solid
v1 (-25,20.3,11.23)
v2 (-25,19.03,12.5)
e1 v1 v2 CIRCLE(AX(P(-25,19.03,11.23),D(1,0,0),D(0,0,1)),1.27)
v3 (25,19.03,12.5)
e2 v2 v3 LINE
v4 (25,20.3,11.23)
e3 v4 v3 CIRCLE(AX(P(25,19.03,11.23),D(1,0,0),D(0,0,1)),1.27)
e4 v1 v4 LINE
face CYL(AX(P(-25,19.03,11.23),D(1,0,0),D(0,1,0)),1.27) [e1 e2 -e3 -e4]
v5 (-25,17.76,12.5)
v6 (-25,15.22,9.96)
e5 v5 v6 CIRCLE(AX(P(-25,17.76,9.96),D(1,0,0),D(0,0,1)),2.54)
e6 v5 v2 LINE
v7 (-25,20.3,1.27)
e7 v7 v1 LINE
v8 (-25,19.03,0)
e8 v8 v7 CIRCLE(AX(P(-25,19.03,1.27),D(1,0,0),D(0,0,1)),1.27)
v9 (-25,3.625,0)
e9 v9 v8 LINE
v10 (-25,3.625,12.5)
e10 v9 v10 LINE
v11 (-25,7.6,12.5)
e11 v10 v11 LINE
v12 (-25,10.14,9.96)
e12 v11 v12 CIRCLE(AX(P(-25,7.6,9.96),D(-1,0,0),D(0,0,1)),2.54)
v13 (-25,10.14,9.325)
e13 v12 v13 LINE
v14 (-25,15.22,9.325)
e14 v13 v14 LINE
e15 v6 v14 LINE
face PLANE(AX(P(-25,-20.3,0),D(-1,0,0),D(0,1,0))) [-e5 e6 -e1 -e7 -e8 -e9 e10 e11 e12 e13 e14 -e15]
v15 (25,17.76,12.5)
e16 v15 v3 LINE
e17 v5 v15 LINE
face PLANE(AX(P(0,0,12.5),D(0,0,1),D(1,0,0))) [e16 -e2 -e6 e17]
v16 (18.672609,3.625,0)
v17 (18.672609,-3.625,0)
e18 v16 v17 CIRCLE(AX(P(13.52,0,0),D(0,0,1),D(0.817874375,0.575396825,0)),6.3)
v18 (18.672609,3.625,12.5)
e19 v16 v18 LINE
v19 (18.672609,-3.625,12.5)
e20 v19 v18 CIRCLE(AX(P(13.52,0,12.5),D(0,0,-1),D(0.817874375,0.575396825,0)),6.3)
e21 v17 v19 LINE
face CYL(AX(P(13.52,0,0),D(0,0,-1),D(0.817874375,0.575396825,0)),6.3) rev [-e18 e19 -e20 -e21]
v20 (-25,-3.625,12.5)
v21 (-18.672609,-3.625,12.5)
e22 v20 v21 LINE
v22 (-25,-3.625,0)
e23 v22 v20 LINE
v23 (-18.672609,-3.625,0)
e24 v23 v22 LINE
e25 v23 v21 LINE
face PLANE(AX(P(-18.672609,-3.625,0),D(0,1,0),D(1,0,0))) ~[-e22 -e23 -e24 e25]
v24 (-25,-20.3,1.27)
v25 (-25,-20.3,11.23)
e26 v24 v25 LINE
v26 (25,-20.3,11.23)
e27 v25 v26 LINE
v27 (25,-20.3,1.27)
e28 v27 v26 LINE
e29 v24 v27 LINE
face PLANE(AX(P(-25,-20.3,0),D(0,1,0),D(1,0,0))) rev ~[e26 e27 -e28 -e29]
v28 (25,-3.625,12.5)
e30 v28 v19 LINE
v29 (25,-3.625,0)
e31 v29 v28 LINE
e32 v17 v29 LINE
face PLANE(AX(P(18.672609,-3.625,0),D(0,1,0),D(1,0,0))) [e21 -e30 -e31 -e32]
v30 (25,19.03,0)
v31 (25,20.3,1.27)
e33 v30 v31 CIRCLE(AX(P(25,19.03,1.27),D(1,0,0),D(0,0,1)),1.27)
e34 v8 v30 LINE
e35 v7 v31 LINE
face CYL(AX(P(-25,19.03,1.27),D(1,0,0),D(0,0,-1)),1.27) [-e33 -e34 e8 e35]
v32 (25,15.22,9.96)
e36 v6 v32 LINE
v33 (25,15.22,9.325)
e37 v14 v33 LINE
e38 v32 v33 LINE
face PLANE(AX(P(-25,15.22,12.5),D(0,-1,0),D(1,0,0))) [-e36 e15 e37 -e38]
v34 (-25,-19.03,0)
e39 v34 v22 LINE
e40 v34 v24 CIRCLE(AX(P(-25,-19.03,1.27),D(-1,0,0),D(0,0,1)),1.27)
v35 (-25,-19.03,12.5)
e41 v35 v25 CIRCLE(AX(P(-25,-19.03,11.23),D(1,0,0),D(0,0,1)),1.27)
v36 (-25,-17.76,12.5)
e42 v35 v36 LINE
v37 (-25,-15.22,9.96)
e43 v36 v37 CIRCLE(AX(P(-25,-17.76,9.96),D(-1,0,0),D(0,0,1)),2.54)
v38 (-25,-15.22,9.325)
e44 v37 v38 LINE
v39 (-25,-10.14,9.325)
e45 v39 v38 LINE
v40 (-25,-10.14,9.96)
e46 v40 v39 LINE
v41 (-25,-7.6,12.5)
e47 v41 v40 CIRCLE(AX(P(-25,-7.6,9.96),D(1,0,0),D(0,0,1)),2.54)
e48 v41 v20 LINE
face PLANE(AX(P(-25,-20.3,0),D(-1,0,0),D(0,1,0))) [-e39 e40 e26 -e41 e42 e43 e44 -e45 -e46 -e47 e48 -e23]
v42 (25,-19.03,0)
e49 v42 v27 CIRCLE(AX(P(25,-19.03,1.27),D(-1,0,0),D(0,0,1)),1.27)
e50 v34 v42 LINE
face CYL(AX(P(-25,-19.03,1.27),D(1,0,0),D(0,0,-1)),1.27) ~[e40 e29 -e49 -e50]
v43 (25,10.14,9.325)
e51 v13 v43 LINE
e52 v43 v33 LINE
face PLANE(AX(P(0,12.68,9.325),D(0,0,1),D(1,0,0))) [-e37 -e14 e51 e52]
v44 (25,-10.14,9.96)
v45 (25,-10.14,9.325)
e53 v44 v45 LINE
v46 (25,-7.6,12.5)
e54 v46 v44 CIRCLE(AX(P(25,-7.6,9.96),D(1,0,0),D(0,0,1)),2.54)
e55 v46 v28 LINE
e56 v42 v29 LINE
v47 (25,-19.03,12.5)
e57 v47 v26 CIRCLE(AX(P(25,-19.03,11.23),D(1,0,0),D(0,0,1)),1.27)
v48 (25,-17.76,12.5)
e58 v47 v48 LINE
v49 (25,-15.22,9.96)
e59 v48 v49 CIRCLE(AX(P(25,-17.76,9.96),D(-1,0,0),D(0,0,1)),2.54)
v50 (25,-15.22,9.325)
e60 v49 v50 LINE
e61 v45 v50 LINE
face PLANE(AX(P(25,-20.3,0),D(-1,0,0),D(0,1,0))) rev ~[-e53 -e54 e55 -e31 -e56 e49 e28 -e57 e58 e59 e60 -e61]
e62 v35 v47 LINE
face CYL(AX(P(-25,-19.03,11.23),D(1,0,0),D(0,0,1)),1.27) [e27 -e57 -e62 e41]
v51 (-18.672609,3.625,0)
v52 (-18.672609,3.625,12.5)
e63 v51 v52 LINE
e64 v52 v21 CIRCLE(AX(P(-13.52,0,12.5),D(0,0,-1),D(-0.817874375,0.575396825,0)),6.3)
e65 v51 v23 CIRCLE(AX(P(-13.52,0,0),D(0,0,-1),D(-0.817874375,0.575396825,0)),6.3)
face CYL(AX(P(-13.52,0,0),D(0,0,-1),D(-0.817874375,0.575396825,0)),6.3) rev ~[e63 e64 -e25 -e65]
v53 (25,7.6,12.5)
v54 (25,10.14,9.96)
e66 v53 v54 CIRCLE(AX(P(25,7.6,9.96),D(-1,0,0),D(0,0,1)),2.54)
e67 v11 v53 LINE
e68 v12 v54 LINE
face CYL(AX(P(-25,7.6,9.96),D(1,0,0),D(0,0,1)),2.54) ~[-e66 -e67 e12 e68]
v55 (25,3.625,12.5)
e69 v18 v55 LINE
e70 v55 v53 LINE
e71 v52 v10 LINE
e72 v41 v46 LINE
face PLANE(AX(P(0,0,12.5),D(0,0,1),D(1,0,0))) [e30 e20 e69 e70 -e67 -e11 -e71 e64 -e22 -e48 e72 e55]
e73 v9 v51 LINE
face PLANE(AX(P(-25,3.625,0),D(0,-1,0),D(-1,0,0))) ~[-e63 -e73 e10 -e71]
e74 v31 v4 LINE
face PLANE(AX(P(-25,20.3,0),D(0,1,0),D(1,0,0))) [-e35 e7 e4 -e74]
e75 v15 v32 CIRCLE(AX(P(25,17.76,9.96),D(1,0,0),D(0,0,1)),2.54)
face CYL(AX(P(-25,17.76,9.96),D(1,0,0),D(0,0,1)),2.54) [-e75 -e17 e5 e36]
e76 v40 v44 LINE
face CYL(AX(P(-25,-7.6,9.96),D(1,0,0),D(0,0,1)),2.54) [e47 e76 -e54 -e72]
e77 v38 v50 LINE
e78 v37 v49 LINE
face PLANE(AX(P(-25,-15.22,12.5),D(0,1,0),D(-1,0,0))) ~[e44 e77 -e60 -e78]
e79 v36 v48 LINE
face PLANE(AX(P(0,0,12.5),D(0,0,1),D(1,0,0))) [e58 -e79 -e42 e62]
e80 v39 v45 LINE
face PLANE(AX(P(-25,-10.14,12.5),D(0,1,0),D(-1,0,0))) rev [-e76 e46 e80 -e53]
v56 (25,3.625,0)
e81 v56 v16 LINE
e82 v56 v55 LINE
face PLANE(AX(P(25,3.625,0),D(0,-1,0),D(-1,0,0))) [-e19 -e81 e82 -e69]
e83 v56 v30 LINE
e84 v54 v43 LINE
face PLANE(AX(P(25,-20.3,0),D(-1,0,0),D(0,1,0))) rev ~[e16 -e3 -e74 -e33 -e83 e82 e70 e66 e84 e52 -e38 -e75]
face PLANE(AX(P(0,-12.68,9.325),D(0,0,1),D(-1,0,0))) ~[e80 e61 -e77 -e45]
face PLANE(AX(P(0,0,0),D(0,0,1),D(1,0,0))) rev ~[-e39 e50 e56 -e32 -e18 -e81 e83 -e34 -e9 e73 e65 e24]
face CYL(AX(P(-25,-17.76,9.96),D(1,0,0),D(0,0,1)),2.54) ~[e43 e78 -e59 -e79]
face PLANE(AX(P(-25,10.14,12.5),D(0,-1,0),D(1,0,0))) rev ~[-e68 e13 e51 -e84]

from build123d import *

# Parameters (mm, degrees)
F0_W     = 50
F0_H     = 40.6
F1_DEPTH = 12.5
F3_DEPTH = 12.501
F4_W     = 50
F4_H     = 5.08
F5_DEPTH = 3.175
F6_R     = 1.27
F7_R     = 2.54


# Not quite as in the source:
# - a pattern or mirror of a feature is missing from the dataset's text; its kind, count and spacing are read off the source's solid


with BuildPart() as f1:
    # F0 (on Top) → F1 (new body)
    with BuildSketch(Plane.XY):
        Rectangle(F0_W, F0_H)
    extrude(amount=F1_DEPTH)

    # F2 (on Top) → F3 (cut, through all)
    with BuildSketch(Plane.XY):
        with BuildLine():
            Line((25, -2.794), (25, 3.625))
            Line((25, 3.625), (18.6726085627, 3.625))
            ThreePointArc((18.6726085627, 3.625), (7.22, 0), (18.6726085627, -3.625))
            Line((18.6726085627, -3.625), (25, -3.625))
            Line((25, -3.625), (25, -2.794))
        make_face()
    f3 = extrude(amount=F3_DEPTH, mode=Mode.SUBTRACT)

    # F3_copies: F3 across plane
    add(f3.mirror(Plane(origin=(0, 0, 0), x_dir=(0, 0, -1), z_dir=(-1, 0, 0))), mode=Mode.SUBTRACT)

    # F4 (on face) → F5 (cut)
    with BuildSketch(Plane.XY.offset(12.5)):
        with Locations((0, 12.68)):
            Rectangle(F4_W, F4_H)
    f5 = extrude(amount=-F5_DEPTH, mode=Mode.SUBTRACT)

    # F5_copies: F5 across plane
    add(f5.mirror(Plane(origin=(0, 0, 0), x_dir=(0, 0, -1), z_dir=(0, -1, 0))), mode=Mode.SUBTRACT)

    # F6
    f6_edges = [f1.edges().sort_by_distance(p)[0] for p in [
        (0, 20.3, 12.5),
        (0, -20.3, 12.5),
        (0, 20.3, 0),
        (0, -20.3, 0),
    ]]
    fillet(f6_edges, radius=F6_R)

    # F7
    f7_edges = [f1.edges().sort_by_distance(p)[0] for p in [
        (0, 15.22, 12.5),
        (0, 10.14, 12.5),
        (0, -10.14, 12.5),
        (0, -15.22, 12.5),
    ]]
    fillet(f7_edges, radius=F7_R)


solid = f1.part
